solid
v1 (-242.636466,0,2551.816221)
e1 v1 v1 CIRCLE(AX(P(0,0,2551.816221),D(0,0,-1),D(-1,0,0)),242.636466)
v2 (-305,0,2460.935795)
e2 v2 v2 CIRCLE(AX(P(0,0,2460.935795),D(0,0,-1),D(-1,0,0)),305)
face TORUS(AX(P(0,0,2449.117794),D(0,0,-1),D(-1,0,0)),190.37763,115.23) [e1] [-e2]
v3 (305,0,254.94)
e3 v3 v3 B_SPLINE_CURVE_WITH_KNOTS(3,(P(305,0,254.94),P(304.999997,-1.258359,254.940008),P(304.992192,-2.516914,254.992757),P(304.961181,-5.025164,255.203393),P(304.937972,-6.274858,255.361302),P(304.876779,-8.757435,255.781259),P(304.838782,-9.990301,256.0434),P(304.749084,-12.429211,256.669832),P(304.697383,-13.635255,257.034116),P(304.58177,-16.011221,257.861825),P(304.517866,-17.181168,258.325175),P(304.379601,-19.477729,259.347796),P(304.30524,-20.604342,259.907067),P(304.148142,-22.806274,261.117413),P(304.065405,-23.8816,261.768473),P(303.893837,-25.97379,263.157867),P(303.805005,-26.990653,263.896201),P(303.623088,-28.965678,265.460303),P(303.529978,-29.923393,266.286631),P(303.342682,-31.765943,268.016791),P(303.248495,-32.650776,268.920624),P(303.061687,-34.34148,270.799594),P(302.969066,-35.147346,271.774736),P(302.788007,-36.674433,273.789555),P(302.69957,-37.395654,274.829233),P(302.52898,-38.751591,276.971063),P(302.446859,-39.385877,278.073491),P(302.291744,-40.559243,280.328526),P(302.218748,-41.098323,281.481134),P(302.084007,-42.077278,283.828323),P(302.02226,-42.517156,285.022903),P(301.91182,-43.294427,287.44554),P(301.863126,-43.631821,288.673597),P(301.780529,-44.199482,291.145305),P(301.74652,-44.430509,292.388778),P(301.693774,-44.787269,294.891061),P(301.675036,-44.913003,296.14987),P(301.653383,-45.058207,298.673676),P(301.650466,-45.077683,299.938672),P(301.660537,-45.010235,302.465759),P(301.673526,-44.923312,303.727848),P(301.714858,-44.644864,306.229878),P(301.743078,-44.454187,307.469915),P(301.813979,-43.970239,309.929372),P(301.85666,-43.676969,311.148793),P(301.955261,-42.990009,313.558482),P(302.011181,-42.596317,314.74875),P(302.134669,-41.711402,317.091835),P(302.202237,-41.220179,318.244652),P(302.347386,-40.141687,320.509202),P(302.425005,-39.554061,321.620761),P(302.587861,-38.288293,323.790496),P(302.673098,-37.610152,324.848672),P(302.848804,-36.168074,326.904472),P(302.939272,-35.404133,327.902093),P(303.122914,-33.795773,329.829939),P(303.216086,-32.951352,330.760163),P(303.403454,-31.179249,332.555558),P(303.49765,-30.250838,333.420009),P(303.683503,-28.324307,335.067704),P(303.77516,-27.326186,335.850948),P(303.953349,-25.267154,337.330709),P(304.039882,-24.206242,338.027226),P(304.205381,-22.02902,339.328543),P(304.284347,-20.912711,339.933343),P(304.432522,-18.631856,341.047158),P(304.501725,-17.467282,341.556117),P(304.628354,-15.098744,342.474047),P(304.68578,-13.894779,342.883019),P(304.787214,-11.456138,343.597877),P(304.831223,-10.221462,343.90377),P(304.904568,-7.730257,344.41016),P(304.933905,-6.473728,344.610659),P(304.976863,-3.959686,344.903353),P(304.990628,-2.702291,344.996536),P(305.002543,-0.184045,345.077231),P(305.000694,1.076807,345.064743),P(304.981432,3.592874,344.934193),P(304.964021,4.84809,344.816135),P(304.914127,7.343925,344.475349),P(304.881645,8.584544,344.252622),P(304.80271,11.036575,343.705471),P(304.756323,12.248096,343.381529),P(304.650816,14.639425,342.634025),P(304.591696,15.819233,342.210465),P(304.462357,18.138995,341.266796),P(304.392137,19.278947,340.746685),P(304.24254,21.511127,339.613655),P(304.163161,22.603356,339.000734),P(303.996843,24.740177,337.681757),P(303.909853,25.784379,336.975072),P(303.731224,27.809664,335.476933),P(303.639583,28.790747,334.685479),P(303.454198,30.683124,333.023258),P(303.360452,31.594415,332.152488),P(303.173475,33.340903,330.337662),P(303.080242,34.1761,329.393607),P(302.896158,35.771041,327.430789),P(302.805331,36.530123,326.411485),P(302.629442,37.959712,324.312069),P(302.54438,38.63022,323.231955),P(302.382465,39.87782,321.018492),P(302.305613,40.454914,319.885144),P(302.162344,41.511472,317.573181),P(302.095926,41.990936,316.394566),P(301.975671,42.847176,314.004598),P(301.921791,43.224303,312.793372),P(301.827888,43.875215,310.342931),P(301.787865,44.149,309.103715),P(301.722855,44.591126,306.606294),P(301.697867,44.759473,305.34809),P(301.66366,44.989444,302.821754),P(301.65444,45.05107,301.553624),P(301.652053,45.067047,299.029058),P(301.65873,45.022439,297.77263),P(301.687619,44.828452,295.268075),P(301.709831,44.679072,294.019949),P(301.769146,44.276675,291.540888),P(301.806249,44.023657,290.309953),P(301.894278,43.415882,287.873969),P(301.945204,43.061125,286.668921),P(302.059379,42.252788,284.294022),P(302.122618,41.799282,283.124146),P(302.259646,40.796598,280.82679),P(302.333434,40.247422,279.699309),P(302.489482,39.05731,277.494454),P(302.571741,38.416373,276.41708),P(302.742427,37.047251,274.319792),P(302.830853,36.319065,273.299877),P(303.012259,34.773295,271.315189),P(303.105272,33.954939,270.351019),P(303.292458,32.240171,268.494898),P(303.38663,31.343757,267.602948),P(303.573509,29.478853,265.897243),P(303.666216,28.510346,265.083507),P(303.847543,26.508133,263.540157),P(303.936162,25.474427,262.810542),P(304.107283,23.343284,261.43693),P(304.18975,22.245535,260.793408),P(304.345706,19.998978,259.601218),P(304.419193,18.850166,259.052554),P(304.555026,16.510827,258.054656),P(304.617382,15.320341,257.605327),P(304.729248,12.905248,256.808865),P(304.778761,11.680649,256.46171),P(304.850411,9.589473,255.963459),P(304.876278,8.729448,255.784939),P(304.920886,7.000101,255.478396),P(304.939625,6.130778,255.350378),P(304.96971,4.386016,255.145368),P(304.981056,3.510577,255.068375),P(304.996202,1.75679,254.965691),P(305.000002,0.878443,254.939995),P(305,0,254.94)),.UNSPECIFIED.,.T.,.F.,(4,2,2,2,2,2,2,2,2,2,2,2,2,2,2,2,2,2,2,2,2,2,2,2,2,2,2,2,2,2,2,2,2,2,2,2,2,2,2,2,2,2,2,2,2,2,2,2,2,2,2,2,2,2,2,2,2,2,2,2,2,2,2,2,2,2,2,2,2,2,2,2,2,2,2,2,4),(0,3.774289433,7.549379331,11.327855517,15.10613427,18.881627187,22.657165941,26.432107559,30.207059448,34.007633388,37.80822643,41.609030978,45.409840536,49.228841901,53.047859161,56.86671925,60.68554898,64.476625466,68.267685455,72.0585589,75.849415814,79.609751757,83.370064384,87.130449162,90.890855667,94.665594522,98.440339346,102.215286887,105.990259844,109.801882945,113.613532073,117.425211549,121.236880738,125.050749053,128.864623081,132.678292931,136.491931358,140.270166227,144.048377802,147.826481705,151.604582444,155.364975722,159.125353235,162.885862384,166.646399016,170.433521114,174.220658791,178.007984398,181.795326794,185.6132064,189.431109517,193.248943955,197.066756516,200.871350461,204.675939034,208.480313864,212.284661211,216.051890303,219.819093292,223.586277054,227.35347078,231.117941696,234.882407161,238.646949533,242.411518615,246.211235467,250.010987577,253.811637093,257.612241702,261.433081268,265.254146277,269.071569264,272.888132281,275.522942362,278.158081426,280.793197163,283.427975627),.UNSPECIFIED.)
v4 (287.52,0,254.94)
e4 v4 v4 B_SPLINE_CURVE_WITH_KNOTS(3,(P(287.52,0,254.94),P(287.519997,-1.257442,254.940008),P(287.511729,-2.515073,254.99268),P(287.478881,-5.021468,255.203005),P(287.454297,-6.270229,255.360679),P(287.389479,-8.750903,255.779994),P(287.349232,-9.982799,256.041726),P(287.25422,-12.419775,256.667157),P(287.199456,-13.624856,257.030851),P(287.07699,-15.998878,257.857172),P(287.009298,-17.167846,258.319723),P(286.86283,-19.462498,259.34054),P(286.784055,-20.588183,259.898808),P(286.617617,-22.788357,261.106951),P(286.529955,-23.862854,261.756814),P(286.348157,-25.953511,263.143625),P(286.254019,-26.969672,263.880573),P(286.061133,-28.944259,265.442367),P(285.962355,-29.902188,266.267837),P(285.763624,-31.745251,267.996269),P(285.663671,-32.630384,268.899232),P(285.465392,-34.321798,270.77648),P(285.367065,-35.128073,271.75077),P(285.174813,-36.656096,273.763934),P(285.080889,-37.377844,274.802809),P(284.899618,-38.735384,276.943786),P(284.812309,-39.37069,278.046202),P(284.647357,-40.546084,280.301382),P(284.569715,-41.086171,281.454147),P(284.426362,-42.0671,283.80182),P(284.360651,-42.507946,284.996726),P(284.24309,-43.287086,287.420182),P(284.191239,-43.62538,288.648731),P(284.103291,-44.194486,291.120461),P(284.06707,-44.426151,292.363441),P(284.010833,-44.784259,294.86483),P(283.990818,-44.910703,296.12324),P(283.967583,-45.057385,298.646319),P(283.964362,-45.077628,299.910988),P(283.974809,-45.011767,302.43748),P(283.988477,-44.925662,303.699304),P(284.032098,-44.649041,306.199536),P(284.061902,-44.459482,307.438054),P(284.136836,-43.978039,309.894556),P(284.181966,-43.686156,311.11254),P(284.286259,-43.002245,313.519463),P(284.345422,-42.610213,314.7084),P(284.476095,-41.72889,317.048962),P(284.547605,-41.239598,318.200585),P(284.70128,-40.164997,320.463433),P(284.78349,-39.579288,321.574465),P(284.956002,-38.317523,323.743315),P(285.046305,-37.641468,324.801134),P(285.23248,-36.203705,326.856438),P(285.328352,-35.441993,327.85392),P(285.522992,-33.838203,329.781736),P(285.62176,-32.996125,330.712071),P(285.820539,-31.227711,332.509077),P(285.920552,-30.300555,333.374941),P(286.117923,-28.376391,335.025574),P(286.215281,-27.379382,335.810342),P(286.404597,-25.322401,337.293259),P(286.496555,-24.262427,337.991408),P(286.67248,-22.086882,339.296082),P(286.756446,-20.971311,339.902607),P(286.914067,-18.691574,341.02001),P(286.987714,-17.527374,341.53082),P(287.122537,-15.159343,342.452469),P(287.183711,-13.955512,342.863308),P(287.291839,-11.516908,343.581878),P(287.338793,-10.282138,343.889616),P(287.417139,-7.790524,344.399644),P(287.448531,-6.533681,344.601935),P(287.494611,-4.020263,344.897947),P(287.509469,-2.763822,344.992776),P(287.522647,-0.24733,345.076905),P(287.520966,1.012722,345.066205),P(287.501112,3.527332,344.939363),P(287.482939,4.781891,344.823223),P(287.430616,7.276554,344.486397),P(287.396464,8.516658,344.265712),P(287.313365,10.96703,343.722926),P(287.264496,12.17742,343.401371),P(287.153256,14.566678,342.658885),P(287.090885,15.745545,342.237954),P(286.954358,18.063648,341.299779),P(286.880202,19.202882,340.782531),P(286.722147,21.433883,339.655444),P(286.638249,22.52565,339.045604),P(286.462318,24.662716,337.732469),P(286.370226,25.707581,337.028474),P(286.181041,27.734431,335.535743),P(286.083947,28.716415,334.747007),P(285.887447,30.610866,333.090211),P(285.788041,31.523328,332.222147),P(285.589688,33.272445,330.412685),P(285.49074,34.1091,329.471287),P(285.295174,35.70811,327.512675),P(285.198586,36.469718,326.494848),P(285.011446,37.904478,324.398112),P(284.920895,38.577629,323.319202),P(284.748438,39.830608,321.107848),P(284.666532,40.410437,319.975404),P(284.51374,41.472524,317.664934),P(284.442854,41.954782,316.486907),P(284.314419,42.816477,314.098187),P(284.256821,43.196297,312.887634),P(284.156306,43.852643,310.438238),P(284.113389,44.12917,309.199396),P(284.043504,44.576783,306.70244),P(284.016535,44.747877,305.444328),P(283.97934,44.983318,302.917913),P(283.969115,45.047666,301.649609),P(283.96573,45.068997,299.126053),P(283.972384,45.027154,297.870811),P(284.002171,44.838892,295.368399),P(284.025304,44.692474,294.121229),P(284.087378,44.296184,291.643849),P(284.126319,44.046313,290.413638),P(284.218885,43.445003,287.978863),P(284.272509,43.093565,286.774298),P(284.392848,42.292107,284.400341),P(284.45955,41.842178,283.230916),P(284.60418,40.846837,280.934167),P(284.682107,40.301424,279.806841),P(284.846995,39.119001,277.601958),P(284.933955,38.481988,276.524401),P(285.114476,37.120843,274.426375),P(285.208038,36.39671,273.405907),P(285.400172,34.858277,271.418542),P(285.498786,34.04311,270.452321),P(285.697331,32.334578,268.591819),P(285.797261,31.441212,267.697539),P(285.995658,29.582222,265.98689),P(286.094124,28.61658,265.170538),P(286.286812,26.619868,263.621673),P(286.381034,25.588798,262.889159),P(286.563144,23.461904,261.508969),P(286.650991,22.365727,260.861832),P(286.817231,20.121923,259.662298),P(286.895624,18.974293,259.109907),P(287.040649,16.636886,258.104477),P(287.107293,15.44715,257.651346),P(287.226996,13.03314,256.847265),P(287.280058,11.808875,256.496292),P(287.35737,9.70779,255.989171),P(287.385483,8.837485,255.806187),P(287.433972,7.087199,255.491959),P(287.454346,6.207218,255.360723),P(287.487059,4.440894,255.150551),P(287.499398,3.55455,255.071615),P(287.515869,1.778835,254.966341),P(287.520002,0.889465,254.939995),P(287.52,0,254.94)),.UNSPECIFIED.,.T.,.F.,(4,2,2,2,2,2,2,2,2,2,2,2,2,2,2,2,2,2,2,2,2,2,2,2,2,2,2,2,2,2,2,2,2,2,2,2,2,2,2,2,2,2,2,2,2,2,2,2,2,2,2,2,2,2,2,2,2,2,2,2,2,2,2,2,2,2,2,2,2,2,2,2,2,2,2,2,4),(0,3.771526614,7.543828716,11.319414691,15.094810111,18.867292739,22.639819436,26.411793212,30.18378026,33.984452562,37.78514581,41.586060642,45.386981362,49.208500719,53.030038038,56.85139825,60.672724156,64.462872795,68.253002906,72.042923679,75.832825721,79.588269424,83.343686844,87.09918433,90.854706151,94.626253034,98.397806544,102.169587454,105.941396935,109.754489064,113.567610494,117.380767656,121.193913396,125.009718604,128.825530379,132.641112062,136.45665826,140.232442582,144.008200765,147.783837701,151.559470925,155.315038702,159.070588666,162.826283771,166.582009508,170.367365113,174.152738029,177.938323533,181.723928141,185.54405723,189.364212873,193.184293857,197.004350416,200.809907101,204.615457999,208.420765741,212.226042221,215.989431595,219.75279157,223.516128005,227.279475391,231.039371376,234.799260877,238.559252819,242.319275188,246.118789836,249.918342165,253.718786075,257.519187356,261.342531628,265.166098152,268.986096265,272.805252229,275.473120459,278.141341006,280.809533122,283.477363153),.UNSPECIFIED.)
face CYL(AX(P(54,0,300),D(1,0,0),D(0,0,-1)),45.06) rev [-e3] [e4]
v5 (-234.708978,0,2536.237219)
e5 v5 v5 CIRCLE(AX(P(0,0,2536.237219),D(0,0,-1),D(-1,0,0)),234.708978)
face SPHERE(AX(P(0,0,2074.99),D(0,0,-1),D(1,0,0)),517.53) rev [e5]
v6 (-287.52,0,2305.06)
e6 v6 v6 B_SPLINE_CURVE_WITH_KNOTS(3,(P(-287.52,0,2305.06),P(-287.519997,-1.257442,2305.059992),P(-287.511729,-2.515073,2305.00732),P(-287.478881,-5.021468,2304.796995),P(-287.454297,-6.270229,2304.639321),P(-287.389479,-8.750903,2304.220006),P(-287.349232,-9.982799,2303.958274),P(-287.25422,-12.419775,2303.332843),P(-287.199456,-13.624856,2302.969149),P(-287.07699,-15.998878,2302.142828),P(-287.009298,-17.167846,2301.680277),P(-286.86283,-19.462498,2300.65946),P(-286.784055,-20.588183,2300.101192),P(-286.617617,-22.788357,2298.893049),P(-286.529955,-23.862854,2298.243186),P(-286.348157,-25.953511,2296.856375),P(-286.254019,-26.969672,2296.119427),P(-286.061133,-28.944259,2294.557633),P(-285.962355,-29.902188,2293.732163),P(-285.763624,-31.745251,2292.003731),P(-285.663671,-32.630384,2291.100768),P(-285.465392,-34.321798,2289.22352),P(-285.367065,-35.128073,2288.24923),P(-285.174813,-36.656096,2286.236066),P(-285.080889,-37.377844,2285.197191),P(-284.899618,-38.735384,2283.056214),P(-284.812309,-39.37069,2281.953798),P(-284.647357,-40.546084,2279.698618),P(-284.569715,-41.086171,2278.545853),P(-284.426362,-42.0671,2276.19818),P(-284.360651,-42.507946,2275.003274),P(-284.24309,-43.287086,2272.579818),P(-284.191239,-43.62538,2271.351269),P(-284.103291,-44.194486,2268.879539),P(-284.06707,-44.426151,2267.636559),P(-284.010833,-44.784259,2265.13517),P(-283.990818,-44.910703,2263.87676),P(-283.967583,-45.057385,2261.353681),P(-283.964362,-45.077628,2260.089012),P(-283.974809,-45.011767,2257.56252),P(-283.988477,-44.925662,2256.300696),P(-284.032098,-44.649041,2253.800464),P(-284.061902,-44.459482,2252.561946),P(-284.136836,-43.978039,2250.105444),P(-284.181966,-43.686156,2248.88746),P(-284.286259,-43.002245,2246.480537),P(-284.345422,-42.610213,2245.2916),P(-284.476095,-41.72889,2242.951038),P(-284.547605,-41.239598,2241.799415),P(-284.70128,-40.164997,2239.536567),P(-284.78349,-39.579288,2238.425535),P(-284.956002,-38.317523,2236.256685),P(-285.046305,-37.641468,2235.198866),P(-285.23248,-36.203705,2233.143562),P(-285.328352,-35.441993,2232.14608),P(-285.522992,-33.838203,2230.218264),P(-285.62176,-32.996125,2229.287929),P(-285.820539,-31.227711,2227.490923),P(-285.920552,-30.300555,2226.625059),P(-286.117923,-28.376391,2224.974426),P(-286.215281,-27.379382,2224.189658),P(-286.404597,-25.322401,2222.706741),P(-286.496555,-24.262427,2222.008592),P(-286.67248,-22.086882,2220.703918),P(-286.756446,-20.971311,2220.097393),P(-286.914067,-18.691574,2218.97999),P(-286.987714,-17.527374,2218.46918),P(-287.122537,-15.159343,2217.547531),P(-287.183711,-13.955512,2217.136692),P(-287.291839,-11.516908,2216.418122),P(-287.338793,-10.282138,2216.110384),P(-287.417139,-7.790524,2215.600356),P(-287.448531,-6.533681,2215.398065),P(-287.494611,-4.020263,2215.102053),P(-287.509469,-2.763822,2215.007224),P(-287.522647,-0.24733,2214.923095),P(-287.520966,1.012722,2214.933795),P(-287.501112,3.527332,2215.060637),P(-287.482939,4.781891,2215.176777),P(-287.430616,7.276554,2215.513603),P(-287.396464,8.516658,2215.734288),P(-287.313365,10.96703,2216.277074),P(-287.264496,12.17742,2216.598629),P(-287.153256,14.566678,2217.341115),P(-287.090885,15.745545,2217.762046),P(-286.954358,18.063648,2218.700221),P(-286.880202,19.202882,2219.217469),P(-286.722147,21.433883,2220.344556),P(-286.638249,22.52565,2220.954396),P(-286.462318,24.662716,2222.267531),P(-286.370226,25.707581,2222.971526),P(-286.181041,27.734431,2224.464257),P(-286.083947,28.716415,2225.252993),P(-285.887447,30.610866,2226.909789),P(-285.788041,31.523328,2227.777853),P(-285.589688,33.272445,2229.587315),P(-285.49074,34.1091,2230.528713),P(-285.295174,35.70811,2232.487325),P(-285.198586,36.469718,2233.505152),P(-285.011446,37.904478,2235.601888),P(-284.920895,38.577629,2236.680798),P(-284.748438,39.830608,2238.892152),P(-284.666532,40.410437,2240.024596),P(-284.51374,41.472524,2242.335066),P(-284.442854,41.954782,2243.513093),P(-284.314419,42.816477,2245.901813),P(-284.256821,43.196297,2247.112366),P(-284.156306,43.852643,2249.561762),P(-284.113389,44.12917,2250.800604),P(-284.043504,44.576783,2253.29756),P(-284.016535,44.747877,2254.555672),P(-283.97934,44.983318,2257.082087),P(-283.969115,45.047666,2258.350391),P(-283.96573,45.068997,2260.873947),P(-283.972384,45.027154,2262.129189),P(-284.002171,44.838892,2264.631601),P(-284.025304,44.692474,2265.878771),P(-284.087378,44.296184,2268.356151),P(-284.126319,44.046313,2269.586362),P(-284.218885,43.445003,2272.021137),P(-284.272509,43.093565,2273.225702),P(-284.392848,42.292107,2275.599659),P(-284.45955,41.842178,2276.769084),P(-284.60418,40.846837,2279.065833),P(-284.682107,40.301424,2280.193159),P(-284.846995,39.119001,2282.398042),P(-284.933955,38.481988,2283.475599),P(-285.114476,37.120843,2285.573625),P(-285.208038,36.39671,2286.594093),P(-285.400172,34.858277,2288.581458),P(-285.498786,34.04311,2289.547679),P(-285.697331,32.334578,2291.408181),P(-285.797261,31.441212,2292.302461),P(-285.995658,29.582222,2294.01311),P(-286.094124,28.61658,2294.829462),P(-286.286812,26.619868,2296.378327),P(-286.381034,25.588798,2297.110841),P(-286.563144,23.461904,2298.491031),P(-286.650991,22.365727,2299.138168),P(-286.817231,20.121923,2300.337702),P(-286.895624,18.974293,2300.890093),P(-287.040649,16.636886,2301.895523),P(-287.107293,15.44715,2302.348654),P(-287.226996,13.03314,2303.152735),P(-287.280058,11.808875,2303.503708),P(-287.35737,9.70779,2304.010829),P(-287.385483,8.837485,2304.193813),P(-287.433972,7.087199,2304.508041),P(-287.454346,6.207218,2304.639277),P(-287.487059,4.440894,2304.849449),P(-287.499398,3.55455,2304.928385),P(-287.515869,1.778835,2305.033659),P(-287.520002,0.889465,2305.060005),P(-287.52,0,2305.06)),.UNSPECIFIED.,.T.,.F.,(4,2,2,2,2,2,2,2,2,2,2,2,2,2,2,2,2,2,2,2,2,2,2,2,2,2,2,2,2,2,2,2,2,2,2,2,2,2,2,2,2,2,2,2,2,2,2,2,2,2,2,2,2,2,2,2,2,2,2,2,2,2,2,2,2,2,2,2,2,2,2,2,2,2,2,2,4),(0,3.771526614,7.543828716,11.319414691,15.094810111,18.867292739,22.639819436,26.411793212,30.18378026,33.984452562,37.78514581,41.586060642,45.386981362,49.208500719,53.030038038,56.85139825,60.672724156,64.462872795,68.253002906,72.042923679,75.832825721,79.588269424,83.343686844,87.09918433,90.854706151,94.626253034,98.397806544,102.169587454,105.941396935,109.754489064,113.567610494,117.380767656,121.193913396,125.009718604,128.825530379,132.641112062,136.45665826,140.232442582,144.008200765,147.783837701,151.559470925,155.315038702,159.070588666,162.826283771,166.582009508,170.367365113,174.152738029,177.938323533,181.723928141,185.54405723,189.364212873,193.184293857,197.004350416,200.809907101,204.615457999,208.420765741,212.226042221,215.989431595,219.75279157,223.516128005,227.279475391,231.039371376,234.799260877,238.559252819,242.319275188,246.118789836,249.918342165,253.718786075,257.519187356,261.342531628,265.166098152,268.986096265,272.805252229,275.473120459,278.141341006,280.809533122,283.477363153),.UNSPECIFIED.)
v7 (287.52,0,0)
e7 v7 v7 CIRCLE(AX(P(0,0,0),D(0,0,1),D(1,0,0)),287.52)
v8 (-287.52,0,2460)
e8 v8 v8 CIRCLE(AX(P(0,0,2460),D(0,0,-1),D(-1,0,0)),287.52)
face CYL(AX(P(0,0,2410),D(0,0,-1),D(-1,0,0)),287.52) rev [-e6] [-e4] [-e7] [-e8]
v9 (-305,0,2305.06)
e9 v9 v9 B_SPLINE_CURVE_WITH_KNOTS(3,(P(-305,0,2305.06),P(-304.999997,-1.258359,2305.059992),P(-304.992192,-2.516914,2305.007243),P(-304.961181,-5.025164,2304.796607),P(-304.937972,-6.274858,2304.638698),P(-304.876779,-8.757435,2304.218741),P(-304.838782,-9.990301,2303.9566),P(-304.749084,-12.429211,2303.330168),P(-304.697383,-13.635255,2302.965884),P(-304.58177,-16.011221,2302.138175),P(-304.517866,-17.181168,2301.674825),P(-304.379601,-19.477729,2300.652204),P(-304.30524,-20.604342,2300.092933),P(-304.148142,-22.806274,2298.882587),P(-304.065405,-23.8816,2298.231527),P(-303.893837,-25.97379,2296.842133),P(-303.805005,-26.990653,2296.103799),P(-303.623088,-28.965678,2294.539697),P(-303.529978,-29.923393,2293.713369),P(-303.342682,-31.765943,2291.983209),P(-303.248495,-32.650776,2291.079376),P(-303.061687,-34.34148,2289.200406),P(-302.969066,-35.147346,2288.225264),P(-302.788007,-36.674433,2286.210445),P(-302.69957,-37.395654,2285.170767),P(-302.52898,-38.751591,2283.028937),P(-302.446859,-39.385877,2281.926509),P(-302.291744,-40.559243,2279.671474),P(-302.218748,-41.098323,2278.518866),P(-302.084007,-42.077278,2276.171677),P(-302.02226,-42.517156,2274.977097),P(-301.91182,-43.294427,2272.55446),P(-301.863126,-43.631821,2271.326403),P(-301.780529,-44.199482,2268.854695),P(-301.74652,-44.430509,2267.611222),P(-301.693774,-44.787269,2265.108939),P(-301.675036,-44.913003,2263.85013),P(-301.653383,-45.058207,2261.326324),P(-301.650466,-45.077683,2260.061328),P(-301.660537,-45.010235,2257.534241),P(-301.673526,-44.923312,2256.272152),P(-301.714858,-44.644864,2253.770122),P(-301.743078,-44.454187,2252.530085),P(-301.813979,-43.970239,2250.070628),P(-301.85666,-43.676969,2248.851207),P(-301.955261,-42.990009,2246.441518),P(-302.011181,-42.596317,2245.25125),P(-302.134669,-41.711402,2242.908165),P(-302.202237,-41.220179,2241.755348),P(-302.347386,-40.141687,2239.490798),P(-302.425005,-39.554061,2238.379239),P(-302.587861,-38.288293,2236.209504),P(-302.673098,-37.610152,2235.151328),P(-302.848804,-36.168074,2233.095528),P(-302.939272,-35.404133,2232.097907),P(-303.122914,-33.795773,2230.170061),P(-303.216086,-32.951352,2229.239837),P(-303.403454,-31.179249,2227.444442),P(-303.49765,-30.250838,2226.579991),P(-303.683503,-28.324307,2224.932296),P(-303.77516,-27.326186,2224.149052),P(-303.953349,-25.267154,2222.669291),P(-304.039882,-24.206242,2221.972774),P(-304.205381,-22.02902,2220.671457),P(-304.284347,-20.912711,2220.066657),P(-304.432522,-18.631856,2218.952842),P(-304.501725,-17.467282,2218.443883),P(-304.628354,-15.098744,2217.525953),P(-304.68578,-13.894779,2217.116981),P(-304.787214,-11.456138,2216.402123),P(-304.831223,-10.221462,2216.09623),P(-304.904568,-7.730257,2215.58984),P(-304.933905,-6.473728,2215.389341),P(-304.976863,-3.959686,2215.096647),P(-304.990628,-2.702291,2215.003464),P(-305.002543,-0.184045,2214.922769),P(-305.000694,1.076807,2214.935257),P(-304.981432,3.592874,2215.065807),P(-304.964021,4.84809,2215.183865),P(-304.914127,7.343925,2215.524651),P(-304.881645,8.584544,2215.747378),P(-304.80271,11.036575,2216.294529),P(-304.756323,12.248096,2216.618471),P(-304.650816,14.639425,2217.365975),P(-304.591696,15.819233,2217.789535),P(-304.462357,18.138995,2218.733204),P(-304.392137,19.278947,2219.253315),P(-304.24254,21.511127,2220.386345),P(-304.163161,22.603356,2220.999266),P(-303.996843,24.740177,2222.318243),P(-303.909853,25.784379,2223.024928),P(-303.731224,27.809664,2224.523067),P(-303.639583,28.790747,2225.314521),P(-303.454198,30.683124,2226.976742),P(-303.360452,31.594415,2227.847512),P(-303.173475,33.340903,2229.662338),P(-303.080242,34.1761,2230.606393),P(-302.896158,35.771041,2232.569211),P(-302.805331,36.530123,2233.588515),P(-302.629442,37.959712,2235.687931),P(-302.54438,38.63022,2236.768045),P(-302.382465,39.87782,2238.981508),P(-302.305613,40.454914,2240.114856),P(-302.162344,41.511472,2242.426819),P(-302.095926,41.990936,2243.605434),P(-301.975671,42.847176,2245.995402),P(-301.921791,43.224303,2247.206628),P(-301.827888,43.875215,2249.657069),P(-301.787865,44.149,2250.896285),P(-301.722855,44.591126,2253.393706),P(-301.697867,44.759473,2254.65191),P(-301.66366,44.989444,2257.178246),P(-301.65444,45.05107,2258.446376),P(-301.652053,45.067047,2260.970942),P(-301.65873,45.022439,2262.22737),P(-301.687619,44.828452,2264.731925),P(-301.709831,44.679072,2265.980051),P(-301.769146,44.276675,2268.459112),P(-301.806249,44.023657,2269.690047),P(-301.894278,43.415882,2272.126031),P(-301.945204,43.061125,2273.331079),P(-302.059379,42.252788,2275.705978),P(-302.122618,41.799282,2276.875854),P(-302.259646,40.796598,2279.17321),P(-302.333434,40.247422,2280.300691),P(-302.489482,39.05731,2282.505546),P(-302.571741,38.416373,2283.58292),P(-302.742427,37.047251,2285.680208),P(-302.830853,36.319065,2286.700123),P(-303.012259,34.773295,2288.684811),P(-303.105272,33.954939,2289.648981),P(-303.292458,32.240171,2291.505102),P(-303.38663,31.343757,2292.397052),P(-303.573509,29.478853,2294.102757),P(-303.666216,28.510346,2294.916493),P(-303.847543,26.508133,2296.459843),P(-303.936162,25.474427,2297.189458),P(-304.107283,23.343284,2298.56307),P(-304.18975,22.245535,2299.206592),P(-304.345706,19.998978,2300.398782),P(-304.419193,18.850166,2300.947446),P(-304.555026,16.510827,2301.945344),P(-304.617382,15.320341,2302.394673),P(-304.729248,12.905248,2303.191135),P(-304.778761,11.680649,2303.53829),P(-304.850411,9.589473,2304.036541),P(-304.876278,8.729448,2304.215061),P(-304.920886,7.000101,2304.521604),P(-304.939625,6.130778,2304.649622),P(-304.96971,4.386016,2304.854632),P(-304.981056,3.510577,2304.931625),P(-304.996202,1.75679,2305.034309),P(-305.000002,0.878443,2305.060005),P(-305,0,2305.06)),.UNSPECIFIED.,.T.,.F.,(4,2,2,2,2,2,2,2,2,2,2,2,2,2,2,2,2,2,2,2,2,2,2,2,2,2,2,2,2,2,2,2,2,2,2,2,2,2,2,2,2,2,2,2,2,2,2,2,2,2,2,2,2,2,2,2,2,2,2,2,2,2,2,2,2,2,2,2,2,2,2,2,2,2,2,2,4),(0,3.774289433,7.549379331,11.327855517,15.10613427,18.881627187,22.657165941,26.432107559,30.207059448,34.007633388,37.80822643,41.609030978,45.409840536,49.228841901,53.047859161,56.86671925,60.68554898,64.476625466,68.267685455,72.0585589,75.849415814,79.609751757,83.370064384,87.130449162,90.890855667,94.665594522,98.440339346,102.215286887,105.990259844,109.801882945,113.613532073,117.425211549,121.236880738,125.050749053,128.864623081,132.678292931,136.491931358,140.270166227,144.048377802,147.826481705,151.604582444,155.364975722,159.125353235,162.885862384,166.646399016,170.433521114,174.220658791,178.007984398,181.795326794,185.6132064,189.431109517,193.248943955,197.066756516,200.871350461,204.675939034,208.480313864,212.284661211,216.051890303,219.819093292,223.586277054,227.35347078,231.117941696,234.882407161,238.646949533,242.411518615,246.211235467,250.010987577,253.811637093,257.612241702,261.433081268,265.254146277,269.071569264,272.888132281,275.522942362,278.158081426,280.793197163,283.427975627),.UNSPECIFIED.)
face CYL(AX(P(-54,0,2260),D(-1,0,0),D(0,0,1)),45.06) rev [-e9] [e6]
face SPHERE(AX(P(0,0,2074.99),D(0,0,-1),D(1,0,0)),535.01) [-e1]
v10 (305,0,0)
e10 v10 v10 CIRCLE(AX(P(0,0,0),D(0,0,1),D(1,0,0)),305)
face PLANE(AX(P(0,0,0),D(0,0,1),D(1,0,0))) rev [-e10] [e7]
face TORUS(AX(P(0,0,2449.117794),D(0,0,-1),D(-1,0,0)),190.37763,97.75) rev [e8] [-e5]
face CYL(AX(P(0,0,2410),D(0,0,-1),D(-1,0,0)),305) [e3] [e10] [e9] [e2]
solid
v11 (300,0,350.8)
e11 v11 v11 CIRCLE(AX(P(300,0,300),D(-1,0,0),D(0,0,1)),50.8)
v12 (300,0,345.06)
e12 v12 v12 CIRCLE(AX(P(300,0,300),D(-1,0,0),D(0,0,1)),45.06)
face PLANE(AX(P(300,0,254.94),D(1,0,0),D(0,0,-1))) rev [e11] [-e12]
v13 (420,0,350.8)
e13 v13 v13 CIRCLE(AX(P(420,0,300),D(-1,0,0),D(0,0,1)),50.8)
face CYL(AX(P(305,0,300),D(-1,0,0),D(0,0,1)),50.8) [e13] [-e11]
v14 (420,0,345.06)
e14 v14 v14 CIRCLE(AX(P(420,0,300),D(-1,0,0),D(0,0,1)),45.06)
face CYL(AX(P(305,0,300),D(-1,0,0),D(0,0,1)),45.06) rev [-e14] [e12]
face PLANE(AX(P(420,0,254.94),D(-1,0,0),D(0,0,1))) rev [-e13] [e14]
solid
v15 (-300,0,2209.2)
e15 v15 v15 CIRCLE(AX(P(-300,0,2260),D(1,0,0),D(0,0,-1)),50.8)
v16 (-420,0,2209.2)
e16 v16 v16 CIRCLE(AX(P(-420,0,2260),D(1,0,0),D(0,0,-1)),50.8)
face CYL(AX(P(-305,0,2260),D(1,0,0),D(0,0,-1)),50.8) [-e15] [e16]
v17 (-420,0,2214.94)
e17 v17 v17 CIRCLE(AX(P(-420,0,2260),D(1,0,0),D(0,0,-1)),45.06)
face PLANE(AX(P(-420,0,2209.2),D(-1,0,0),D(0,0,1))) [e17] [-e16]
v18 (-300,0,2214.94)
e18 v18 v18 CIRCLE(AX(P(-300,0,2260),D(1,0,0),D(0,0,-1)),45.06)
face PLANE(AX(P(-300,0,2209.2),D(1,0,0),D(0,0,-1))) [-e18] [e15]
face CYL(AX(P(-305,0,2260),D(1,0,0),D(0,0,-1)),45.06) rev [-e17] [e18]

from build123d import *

# Parameters (mm, degrees)
SKETCH1_R           = 305
SKETCH1_R_2         = 287.52
BOSS_EXTRUDE1_DEPTH = 2410
SKETCH3_W           = 120
SKETCH3_H           = 5.74
SKETCH4_W           = 120
SKETCH4_H           = 5.74
SKETCH5_R           = 45.06
CUT_EXTRUDE1_DEPTH  = 366
SKETCH6_R           = 45.06
CUT_EXTRUDE2_DEPTH  = 366


with BuildPart() as part:
    # Sketch1 → Boss-Extrude1 (new body)
    with BuildSketch(Plane.XY):
        Circle(SKETCH1_R)
        Circle(SKETCH1_R_2, mode=Mode.SUBTRACT)
    extrude(amount=BOSS_EXTRUDE1_DEPTH)

    # Sketch2 → Revolve1 (revolve)
    with BuildSketch(Plane(origin=(0, 0, 0), x_dir=(1, 0, 0), z_dir=(0, 1, 0))):
        with BuildLine():
            Line((287.52, -2410), (287.52, -2460))
            ThreePointArc((287.52, -2460), (270.731420067, -2504.780446806), (234.708977843, -2536.23721855))
            ThreePointArc((234.708977843, -2536.23721855), (120.681456496, -2578.252642124), (0, -2592.52))
            Line((0, -2592.52), (0, -2610))
            ThreePointArc((0, -2610), (124.757571619, -2595.250750416), (242.636465974, -2551.816221468))
            ThreePointArc((242.636465974, -2551.816221468), (285.388930418, -2514.315997098), (305, -2460.935794835))
            Line((305, -2460.935794835), (305, -2410))
            Line((305, -2410), (287.52, -2410))
        make_face()
    revolve(axis=Axis((0, 0, 0), (0, 0, 1)))

    # Sketch5 → Cut-Extrude1 (cut)
    with BuildSketch(Plane(origin=(420, 0, 0), x_dir=(0, 0, -1), z_dir=(1, 0, 0))):
        with Locations((-300, 0)):
            Circle(SKETCH5_R)
    extrude(amount=-CUT_EXTRUDE1_DEPTH, mode=Mode.SUBTRACT)

    # Sketch6 → Cut-Extrude2 (cut)
    with BuildSketch(Plane.ZY.offset(420)):
        with Locations((2260, 0)):
            Circle(SKETCH6_R)
    extrude(amount=-CUT_EXTRUDE2_DEPTH, mode=Mode.SUBTRACT)


with BuildPart() as body_2:
    # Sketch3 → Revolve2 (revolve)
    with BuildSketch(Plane(origin=(0, 0, 0), x_dir=(1, 0, 0), z_dir=(0, 1, 0))):
        with Locations((360, -252.07)):
            Rectangle(SKETCH3_W, SKETCH3_H)
    revolve(axis=Axis((305, 0, 300), (1, 0, 0)))


with BuildPart() as body_3:
    # Sketch4 → Revolve3 (revolve)
    with BuildSketch(Plane(origin=(0, 0, 0), x_dir=(1, 0, 0), z_dir=(0, 1, 0))):
        with Locations((-360, -2212.07)):
            Rectangle(SKETCH4_W, SKETCH4_H)
    revolve(axis=Axis((-305, 0, 2260), (-1, 0, 0)))


solid = Compound([part.part, body_2.part, body_3.part])
